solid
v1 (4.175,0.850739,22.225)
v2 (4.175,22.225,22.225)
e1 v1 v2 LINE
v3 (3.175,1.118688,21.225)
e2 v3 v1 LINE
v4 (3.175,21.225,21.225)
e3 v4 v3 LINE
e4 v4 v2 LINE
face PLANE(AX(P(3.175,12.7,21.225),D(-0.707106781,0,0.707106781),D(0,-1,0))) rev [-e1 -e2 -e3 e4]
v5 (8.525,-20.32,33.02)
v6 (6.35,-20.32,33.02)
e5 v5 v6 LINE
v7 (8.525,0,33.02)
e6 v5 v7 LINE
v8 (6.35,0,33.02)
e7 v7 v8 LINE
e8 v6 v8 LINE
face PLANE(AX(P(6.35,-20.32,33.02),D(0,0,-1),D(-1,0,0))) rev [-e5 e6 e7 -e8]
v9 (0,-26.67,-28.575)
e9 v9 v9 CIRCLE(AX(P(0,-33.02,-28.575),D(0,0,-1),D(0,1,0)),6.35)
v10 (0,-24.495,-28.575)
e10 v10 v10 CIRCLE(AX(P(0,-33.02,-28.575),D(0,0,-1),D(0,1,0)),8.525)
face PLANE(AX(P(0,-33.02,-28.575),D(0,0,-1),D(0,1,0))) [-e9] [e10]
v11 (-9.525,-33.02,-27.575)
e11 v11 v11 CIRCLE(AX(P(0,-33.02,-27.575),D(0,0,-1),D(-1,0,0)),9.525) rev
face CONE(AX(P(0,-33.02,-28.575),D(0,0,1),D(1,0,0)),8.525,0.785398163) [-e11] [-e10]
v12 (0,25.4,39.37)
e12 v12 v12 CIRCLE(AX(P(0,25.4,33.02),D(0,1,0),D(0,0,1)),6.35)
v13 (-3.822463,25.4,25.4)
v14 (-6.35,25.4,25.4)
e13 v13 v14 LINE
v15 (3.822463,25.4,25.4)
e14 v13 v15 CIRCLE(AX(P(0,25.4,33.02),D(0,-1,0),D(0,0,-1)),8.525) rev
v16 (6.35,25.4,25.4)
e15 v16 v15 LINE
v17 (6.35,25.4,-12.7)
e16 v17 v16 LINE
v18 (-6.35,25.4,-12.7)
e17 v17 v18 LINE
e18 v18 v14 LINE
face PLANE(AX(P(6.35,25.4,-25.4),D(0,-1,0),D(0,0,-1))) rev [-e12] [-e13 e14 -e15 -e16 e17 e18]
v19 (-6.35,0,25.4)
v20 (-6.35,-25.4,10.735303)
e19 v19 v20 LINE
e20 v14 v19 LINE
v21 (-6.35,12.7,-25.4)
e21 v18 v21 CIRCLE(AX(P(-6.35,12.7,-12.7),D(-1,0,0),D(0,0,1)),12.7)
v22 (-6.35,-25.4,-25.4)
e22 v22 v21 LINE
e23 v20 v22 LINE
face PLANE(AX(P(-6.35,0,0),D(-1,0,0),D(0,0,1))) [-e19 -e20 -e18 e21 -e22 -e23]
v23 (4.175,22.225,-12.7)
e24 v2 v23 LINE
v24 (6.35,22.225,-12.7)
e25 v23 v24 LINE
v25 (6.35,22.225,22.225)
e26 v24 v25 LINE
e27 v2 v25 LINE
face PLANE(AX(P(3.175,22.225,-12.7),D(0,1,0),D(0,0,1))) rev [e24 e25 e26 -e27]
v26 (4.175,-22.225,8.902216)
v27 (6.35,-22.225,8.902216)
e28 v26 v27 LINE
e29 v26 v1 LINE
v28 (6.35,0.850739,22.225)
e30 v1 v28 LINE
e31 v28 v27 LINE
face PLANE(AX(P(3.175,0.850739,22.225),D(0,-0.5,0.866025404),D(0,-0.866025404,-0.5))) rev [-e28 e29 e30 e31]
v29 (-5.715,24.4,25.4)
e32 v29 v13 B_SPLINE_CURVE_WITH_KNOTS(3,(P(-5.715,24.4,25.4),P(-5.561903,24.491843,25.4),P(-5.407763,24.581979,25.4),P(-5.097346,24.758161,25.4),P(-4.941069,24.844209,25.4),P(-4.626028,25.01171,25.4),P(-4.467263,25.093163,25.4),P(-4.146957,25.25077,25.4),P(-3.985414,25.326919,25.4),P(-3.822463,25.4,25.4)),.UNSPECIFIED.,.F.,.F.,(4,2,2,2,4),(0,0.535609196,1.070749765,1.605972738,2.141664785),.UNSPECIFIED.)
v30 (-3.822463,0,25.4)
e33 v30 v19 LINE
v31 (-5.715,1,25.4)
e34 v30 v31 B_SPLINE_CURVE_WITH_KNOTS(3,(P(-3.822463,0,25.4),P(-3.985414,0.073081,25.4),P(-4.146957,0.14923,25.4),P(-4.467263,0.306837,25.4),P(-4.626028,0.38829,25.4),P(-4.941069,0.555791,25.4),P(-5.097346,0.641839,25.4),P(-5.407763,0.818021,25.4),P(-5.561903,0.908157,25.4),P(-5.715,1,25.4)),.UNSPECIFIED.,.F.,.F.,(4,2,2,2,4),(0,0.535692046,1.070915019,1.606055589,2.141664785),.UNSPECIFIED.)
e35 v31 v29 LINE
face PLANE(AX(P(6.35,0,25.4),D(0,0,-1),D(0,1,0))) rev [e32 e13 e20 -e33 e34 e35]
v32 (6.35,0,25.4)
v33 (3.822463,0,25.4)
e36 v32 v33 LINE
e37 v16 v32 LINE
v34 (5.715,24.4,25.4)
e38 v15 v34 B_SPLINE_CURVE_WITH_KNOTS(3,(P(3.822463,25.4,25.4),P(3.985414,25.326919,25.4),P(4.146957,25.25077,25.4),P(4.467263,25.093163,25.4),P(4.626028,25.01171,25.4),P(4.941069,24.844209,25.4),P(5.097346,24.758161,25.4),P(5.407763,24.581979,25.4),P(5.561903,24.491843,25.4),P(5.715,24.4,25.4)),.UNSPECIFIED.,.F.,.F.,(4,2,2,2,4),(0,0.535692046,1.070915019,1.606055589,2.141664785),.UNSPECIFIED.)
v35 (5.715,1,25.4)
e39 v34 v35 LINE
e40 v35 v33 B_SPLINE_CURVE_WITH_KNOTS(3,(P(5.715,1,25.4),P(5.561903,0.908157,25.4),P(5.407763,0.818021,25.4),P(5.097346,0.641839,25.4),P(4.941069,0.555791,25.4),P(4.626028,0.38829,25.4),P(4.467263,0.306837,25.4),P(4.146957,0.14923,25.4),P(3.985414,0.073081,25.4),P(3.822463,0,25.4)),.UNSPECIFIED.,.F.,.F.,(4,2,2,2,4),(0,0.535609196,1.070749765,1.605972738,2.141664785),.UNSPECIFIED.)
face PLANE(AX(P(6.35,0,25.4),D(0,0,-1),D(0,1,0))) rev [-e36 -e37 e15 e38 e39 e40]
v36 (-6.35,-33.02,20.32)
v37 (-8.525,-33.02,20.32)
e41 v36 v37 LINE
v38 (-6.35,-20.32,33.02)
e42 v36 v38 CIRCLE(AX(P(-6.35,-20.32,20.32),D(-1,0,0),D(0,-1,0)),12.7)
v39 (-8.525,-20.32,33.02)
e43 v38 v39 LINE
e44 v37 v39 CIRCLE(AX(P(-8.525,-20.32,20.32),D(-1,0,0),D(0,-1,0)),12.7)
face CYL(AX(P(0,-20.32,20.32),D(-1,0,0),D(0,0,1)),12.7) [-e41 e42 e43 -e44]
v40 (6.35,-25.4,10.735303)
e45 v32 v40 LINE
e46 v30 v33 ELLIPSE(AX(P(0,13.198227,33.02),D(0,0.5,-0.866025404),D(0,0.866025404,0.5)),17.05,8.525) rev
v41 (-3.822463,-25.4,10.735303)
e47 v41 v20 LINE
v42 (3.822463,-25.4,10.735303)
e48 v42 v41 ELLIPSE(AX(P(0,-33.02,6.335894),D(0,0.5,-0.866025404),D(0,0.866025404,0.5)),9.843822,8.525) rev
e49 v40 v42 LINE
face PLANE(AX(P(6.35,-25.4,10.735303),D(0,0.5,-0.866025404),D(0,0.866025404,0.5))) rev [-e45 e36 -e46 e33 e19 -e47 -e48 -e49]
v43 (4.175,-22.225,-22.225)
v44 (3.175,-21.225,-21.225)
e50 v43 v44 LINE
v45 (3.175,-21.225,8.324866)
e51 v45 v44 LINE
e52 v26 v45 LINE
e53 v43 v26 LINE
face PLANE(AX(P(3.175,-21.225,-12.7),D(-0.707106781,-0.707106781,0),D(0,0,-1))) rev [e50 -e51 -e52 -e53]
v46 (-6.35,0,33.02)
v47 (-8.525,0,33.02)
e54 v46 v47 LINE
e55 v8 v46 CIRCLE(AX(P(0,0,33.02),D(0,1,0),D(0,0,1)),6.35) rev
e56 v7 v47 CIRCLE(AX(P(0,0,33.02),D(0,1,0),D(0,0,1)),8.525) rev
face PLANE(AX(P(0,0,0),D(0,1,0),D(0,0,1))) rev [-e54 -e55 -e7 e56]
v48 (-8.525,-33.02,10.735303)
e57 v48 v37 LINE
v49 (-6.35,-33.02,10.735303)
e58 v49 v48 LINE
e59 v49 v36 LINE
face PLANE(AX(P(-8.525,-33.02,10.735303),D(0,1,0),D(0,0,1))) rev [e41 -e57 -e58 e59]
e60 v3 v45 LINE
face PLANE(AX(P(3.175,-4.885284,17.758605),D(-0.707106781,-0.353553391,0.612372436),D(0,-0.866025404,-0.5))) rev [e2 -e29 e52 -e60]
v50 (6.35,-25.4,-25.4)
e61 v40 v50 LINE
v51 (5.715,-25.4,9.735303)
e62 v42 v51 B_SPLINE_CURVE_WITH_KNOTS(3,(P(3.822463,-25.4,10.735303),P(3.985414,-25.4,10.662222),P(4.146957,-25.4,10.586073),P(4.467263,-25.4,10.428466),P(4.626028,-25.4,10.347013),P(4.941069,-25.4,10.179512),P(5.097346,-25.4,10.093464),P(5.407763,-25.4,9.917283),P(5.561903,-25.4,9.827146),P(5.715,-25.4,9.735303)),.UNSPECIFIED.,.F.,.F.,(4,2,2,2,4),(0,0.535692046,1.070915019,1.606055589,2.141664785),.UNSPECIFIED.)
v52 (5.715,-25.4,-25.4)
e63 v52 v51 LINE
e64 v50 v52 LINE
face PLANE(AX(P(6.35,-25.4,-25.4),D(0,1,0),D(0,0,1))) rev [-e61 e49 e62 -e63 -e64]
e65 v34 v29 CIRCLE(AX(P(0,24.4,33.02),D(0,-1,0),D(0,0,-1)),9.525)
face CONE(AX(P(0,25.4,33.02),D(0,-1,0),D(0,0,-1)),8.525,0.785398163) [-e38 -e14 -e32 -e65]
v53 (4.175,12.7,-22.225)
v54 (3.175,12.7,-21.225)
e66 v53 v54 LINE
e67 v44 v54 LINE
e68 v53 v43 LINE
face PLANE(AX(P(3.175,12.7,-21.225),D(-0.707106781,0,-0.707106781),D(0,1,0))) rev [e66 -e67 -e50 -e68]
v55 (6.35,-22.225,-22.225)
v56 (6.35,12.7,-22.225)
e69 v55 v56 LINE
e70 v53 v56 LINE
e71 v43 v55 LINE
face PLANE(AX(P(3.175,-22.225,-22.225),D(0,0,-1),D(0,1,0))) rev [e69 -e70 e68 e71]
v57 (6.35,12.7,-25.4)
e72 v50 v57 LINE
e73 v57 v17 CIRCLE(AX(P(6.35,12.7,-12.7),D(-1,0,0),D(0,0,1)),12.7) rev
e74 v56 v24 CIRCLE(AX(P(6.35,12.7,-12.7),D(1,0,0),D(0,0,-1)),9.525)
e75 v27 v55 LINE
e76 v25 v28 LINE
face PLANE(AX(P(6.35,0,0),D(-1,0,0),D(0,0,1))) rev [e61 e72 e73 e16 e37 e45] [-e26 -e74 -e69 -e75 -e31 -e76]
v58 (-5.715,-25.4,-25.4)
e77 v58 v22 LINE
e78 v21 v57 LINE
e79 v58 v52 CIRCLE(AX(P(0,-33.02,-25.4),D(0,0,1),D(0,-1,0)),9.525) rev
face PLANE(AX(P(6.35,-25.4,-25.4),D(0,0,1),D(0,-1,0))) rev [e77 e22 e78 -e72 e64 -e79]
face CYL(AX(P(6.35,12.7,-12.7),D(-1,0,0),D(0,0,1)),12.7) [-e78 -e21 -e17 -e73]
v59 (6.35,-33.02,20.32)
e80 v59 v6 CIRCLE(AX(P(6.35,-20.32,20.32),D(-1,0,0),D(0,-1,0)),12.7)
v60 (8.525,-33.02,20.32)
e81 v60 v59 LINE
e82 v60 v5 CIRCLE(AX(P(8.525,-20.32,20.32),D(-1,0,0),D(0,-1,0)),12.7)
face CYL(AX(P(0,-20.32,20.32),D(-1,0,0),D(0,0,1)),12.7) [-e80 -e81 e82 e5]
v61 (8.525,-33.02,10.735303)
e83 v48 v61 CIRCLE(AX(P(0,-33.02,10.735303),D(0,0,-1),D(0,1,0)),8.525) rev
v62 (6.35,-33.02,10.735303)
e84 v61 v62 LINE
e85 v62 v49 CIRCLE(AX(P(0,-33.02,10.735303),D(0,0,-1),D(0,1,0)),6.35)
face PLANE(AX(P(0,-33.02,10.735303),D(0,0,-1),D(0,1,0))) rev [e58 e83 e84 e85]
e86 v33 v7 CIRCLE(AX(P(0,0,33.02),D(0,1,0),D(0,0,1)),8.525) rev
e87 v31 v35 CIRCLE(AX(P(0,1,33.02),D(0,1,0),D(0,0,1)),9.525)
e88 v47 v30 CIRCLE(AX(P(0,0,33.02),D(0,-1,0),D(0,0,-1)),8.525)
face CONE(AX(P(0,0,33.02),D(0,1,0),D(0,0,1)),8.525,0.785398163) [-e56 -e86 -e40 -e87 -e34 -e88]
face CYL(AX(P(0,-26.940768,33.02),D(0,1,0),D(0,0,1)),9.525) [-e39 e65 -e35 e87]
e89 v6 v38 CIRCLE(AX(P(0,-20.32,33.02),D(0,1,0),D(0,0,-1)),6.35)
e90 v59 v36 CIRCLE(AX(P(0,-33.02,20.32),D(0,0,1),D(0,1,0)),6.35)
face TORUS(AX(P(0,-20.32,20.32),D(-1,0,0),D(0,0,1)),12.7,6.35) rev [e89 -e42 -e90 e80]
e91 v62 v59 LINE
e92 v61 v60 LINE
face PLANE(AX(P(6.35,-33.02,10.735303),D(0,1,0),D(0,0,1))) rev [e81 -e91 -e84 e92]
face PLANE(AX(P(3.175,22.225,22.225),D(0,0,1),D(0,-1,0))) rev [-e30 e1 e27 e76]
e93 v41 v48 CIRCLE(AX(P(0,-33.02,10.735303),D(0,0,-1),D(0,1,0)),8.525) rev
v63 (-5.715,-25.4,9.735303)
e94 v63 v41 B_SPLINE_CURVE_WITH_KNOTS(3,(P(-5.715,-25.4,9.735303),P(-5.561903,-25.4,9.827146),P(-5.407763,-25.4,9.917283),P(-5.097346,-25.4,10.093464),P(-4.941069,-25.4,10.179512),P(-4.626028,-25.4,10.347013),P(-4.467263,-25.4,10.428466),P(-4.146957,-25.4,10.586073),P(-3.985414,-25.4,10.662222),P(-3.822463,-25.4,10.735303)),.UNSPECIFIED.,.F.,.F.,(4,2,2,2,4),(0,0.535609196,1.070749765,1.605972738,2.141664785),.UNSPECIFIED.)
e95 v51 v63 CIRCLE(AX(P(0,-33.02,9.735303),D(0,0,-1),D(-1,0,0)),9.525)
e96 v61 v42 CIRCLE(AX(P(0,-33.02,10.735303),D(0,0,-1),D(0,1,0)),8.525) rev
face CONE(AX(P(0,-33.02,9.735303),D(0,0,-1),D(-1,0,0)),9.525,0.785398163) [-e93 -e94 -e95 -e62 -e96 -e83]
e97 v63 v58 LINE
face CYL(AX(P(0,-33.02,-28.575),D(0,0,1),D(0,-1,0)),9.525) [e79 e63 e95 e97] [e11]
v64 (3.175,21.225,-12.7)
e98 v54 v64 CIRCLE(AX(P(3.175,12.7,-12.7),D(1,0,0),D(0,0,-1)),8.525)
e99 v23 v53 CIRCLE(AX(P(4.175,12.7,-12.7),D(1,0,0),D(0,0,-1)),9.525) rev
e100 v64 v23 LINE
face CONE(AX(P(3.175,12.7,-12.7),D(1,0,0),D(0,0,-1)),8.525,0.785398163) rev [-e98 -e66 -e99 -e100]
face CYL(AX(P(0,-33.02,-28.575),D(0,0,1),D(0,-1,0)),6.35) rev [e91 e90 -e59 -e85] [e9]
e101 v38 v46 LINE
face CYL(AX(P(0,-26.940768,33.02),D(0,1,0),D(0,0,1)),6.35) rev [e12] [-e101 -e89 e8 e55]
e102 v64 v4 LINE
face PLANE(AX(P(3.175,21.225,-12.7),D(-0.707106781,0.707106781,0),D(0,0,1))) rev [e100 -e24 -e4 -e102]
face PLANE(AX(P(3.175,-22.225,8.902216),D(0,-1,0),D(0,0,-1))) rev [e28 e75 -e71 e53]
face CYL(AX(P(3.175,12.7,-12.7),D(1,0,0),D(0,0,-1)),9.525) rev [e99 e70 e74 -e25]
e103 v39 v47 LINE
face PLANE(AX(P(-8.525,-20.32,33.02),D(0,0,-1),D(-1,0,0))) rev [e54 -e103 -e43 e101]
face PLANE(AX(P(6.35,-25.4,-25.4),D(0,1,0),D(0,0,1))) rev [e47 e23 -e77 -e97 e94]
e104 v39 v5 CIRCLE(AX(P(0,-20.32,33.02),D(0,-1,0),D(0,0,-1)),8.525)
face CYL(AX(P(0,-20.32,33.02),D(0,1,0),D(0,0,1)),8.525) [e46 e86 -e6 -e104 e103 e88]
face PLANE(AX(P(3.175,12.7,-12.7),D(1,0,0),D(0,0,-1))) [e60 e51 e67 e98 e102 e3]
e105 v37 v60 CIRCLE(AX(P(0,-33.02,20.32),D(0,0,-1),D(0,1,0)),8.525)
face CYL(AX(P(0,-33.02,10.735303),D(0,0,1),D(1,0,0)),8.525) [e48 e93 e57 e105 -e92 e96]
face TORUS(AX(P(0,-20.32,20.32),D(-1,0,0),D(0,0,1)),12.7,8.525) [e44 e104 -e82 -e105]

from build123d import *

# Parameters (mm, degrees)
BOSS_EXTRUDE1_DEPTH      = 6.35
FILLET1_R                = 12.7
CUT_EXTRUDE2_DEPTH       = 3.175
BOSS_EXTRUDE2_DEPTH      = 3.175
BOSS_EXTRUDE2_DEPTH_BACK = 36.135303
SKETCH4_R                = 9.525
SKETCH4_R_2              = 6.35
SKETCH5_R                = 9.525
SKETCH5_R_2              = 6.35
BOSS_EXTRUDE3_DEPTH      = 25.4
CHAMFER2_SIZE            = 1
CHAMFER4_SIZE            = 1


with BuildPart() as part:
    # Sketch1 → Boss-Extrude1 (new, symmetric)
    with BuildSketch(Plane.YZ):
        Polygon((-25.4, 10.735303163), (0, 25.4), (25.4, 25.4), (25.4, -25.4), (-25.4, -25.4), align=None)
    extrude(amount=BOSS_EXTRUDE1_DEPTH, both=True)

    # Fillet1
    fillet1_edges = [part.edges().sort_by_distance(p)[0] for p in [
        (0, 25.4, -25.4),
    ]]
    fillet(fillet1_edges, radius=FILLET1_R)

    # Sketch3 → Cut-Extrude2 (cut)
    with BuildSketch(Plane.YZ.offset(6.35)):
        with BuildLine():
            Line((-22.225, -22.225), (12.7, -22.225))
            ThreePointArc((12.7, -22.225), (19.435192091, -19.435192091), (22.225, -12.7))
            Line((22.225, -12.7), (22.225, 22.225))
            Line((22.225, 22.225), (0.850738686, 22.225))
            Line((0.850738686, 22.225), (-22.225, 8.902216058))
            Line((-22.225, 8.902216058), (-22.225, -22.225))
        make_face()
    extrude(amount=-CUT_EXTRUDE2_DEPTH, mode=Mode.SUBTRACT)

    # Sketch4 → Boss-Extrude2 (add, two sides: drawn at the far end of the back side and taken through both)
    with BuildSketch(Plane(origin=(0, 0, -25.4), x_dir=(1, 0, 0), z_dir=(0, 0, -1)).offset(-BOSS_EXTRUDE2_DEPTH_BACK)):
        with Locations(Location((0, 33.02, 0), (0, 0, 233.130102354))):
            Circle(SKETCH4_R)
        with Locations(Location((0, 33.02, 0), (0, 0, 270))):
            Circle(SKETCH4_R_2, mode=Mode.SUBTRACT)
    extrude(amount=BOSS_EXTRUDE2_DEPTH + BOSS_EXTRUDE2_DEPTH_BACK)

    # Sketch5 → Boss-Extrude3 (add)
    with BuildSketch(Plane(origin=(0, 25.4, 0), x_dir=(-1, 0, 0), z_dir=(0, 1, 0))):
        with Locations((0, 33.02)):
            Circle(SKETCH5_R)
        with Locations(Location((0, 33.02, 0), (0, 0, 90))):
            Circle(SKETCH5_R_2, mode=Mode.SUBTRACT)
    extrude(amount=-BOSS_EXTRUDE3_DEPTH)

    # Chamfer2
    # the kernel refuses this chamfer: 1 mm, written as the material it takes off along each edge
    with BuildSketch(Plane(origin=(0, -33.02, 10.735303), x_dir=(0.3638595085405839, 0.931453841070294, 0), z_dir=(-0.931453841070294, 0.3638595085405839, 0))) as chamfer2_piece_1_section:
        Polygon((9.525, CHAMFER2_SIZE), (9.525 - CHAMFER2_SIZE, 0), (9.525, 0), align=None)
    chamfer2_piece_1 = revolve(axis=Axis((0, -33.02, 10.735303), (0, 0, -1)), revolution_arc=317.325176487, mode=Mode.PRIVATE)
    chamfer2_piece_1 = split(chamfer2_piece_1, bisect_by=Plane(origin=(5.777045626, -25.4, 10.24862198), z_dir=(0, -1, 0)), keep=Keep.TOP, mode=Mode.PRIVATE)
    add(chamfer2_piece_1, mode=Mode.SUBTRACT)
    with BuildSketch(Plane(origin=(0, -33.02, -28.575), x_dir=(-0.6000000000021781, 0.7999999999983665, 0), z_dir=(-0.7999999999983665, -0.6000000000021781, 0))) as chamfer2_piece_2:
        Polygon((9.525, -CHAMFER2_SIZE), (9.525 - CHAMFER2_SIZE, 0), (9.525, 0), align=None)
    revolve(axis=Axis((0, -33.02, -28.575), (0, 0, -1)), mode=Mode.SUBTRACT)
    with BuildSketch(Plane(origin=(0, 25.4, 33.02), x_dir=(-0.3638595085405501, 0, -0.9314538410703074), z_dir=(0.9314538410703074, 0, -0.3638595085405501))) as chamfer2_piece_3_section:
        Polygon((9.525, -CHAMFER2_SIZE), (9.525 - CHAMFER2_SIZE, 0), (9.525, 0), align=None)
    chamfer2_piece_3 = revolve(axis=Axis((0, 25.4, 33.02), (0, 1, 0)), revolution_arc=317.325176487, mode=Mode.PRIVATE)
    chamfer2_piece_3 = split(chamfer2_piece_3, bisect_by=Plane(origin=(0, 24.920234358, 25.4), z_dir=(0, 0, 1)), keep=Keep.TOP, mode=Mode.PRIVATE)
    add(chamfer2_piece_3, mode=Mode.SUBTRACT)
    with BuildSketch(Plane(origin=(0, 0, 33.02), x_dir=(-0.3638595085405531, 0, -0.9314538410703063), z_dir=(0.9314538410703063, 0, -0.3638595085405531))) as chamfer2_piece_4_section:
        Polygon((9.525, CHAMFER2_SIZE), (9.525 - CHAMFER2_SIZE, 0), (9.525, 0), align=None)
    chamfer2_piece_4 = revolve(axis=Axis((0, 0, 33.02), (0, 1, 0)), revolution_arc=317.325176487, mode=Mode.PRIVATE)
    chamfer2_piece_4 = split(chamfer2_piece_4, bisect_by=Plane(origin=(-5.452412952, 0.490850729, 25.4), z_dir=(0, 0, 1)), keep=Keep.TOP, mode=Mode.PRIVATE)
    add(chamfer2_piece_4, mode=Mode.SUBTRACT)

    # Sweep3: sweep along a path in Sketch6
    with BuildLine(Plane.YZ) as sweep3_path:
        Line((0, 33.02), (-20.32, 33.02))
        ThreePointArc((-20.32, 33.02), (-29.300256121, 29.300256121), (-33.02, 20.32))
        Line((-33.02, 20.32), (-33.02, 10.735303163))
    # Sketch7 → Sweep3 (sweep)
    with BuildSketch(Plane.XZ):
        with BuildLine():
            Line((-8.525, 33.02), (-6.35, 33.02))
            ThreePointArc((-6.35, 33.02), (0, 26.67), (6.35, 33.02))
            Line((6.35, 33.02), (8.525, 33.02))
            ThreePointArc((8.525, 33.02), (0, 24.495), (-8.525, 33.02))
        make_face()
    sweep(path=sweep3_path.line)

    # Chamfer4
    chamfer4_edges = [part.edges().sort_by_distance(p)[0] for p in [
        (3.175, -22.225, -6.661391971),
        (3.175, -10.687130657, 15.563608029),
        (3.175, 11.537869343, 22.225),
        (3.175, 22.225, 4.7625),
        (3.175, 19.435192091, -19.435192091),
        (3.175, -4.7625, -22.225),
    ]]
    chamfer(chamfer4_edges, length=CHAMFER4_SIZE)


solid = part.part
